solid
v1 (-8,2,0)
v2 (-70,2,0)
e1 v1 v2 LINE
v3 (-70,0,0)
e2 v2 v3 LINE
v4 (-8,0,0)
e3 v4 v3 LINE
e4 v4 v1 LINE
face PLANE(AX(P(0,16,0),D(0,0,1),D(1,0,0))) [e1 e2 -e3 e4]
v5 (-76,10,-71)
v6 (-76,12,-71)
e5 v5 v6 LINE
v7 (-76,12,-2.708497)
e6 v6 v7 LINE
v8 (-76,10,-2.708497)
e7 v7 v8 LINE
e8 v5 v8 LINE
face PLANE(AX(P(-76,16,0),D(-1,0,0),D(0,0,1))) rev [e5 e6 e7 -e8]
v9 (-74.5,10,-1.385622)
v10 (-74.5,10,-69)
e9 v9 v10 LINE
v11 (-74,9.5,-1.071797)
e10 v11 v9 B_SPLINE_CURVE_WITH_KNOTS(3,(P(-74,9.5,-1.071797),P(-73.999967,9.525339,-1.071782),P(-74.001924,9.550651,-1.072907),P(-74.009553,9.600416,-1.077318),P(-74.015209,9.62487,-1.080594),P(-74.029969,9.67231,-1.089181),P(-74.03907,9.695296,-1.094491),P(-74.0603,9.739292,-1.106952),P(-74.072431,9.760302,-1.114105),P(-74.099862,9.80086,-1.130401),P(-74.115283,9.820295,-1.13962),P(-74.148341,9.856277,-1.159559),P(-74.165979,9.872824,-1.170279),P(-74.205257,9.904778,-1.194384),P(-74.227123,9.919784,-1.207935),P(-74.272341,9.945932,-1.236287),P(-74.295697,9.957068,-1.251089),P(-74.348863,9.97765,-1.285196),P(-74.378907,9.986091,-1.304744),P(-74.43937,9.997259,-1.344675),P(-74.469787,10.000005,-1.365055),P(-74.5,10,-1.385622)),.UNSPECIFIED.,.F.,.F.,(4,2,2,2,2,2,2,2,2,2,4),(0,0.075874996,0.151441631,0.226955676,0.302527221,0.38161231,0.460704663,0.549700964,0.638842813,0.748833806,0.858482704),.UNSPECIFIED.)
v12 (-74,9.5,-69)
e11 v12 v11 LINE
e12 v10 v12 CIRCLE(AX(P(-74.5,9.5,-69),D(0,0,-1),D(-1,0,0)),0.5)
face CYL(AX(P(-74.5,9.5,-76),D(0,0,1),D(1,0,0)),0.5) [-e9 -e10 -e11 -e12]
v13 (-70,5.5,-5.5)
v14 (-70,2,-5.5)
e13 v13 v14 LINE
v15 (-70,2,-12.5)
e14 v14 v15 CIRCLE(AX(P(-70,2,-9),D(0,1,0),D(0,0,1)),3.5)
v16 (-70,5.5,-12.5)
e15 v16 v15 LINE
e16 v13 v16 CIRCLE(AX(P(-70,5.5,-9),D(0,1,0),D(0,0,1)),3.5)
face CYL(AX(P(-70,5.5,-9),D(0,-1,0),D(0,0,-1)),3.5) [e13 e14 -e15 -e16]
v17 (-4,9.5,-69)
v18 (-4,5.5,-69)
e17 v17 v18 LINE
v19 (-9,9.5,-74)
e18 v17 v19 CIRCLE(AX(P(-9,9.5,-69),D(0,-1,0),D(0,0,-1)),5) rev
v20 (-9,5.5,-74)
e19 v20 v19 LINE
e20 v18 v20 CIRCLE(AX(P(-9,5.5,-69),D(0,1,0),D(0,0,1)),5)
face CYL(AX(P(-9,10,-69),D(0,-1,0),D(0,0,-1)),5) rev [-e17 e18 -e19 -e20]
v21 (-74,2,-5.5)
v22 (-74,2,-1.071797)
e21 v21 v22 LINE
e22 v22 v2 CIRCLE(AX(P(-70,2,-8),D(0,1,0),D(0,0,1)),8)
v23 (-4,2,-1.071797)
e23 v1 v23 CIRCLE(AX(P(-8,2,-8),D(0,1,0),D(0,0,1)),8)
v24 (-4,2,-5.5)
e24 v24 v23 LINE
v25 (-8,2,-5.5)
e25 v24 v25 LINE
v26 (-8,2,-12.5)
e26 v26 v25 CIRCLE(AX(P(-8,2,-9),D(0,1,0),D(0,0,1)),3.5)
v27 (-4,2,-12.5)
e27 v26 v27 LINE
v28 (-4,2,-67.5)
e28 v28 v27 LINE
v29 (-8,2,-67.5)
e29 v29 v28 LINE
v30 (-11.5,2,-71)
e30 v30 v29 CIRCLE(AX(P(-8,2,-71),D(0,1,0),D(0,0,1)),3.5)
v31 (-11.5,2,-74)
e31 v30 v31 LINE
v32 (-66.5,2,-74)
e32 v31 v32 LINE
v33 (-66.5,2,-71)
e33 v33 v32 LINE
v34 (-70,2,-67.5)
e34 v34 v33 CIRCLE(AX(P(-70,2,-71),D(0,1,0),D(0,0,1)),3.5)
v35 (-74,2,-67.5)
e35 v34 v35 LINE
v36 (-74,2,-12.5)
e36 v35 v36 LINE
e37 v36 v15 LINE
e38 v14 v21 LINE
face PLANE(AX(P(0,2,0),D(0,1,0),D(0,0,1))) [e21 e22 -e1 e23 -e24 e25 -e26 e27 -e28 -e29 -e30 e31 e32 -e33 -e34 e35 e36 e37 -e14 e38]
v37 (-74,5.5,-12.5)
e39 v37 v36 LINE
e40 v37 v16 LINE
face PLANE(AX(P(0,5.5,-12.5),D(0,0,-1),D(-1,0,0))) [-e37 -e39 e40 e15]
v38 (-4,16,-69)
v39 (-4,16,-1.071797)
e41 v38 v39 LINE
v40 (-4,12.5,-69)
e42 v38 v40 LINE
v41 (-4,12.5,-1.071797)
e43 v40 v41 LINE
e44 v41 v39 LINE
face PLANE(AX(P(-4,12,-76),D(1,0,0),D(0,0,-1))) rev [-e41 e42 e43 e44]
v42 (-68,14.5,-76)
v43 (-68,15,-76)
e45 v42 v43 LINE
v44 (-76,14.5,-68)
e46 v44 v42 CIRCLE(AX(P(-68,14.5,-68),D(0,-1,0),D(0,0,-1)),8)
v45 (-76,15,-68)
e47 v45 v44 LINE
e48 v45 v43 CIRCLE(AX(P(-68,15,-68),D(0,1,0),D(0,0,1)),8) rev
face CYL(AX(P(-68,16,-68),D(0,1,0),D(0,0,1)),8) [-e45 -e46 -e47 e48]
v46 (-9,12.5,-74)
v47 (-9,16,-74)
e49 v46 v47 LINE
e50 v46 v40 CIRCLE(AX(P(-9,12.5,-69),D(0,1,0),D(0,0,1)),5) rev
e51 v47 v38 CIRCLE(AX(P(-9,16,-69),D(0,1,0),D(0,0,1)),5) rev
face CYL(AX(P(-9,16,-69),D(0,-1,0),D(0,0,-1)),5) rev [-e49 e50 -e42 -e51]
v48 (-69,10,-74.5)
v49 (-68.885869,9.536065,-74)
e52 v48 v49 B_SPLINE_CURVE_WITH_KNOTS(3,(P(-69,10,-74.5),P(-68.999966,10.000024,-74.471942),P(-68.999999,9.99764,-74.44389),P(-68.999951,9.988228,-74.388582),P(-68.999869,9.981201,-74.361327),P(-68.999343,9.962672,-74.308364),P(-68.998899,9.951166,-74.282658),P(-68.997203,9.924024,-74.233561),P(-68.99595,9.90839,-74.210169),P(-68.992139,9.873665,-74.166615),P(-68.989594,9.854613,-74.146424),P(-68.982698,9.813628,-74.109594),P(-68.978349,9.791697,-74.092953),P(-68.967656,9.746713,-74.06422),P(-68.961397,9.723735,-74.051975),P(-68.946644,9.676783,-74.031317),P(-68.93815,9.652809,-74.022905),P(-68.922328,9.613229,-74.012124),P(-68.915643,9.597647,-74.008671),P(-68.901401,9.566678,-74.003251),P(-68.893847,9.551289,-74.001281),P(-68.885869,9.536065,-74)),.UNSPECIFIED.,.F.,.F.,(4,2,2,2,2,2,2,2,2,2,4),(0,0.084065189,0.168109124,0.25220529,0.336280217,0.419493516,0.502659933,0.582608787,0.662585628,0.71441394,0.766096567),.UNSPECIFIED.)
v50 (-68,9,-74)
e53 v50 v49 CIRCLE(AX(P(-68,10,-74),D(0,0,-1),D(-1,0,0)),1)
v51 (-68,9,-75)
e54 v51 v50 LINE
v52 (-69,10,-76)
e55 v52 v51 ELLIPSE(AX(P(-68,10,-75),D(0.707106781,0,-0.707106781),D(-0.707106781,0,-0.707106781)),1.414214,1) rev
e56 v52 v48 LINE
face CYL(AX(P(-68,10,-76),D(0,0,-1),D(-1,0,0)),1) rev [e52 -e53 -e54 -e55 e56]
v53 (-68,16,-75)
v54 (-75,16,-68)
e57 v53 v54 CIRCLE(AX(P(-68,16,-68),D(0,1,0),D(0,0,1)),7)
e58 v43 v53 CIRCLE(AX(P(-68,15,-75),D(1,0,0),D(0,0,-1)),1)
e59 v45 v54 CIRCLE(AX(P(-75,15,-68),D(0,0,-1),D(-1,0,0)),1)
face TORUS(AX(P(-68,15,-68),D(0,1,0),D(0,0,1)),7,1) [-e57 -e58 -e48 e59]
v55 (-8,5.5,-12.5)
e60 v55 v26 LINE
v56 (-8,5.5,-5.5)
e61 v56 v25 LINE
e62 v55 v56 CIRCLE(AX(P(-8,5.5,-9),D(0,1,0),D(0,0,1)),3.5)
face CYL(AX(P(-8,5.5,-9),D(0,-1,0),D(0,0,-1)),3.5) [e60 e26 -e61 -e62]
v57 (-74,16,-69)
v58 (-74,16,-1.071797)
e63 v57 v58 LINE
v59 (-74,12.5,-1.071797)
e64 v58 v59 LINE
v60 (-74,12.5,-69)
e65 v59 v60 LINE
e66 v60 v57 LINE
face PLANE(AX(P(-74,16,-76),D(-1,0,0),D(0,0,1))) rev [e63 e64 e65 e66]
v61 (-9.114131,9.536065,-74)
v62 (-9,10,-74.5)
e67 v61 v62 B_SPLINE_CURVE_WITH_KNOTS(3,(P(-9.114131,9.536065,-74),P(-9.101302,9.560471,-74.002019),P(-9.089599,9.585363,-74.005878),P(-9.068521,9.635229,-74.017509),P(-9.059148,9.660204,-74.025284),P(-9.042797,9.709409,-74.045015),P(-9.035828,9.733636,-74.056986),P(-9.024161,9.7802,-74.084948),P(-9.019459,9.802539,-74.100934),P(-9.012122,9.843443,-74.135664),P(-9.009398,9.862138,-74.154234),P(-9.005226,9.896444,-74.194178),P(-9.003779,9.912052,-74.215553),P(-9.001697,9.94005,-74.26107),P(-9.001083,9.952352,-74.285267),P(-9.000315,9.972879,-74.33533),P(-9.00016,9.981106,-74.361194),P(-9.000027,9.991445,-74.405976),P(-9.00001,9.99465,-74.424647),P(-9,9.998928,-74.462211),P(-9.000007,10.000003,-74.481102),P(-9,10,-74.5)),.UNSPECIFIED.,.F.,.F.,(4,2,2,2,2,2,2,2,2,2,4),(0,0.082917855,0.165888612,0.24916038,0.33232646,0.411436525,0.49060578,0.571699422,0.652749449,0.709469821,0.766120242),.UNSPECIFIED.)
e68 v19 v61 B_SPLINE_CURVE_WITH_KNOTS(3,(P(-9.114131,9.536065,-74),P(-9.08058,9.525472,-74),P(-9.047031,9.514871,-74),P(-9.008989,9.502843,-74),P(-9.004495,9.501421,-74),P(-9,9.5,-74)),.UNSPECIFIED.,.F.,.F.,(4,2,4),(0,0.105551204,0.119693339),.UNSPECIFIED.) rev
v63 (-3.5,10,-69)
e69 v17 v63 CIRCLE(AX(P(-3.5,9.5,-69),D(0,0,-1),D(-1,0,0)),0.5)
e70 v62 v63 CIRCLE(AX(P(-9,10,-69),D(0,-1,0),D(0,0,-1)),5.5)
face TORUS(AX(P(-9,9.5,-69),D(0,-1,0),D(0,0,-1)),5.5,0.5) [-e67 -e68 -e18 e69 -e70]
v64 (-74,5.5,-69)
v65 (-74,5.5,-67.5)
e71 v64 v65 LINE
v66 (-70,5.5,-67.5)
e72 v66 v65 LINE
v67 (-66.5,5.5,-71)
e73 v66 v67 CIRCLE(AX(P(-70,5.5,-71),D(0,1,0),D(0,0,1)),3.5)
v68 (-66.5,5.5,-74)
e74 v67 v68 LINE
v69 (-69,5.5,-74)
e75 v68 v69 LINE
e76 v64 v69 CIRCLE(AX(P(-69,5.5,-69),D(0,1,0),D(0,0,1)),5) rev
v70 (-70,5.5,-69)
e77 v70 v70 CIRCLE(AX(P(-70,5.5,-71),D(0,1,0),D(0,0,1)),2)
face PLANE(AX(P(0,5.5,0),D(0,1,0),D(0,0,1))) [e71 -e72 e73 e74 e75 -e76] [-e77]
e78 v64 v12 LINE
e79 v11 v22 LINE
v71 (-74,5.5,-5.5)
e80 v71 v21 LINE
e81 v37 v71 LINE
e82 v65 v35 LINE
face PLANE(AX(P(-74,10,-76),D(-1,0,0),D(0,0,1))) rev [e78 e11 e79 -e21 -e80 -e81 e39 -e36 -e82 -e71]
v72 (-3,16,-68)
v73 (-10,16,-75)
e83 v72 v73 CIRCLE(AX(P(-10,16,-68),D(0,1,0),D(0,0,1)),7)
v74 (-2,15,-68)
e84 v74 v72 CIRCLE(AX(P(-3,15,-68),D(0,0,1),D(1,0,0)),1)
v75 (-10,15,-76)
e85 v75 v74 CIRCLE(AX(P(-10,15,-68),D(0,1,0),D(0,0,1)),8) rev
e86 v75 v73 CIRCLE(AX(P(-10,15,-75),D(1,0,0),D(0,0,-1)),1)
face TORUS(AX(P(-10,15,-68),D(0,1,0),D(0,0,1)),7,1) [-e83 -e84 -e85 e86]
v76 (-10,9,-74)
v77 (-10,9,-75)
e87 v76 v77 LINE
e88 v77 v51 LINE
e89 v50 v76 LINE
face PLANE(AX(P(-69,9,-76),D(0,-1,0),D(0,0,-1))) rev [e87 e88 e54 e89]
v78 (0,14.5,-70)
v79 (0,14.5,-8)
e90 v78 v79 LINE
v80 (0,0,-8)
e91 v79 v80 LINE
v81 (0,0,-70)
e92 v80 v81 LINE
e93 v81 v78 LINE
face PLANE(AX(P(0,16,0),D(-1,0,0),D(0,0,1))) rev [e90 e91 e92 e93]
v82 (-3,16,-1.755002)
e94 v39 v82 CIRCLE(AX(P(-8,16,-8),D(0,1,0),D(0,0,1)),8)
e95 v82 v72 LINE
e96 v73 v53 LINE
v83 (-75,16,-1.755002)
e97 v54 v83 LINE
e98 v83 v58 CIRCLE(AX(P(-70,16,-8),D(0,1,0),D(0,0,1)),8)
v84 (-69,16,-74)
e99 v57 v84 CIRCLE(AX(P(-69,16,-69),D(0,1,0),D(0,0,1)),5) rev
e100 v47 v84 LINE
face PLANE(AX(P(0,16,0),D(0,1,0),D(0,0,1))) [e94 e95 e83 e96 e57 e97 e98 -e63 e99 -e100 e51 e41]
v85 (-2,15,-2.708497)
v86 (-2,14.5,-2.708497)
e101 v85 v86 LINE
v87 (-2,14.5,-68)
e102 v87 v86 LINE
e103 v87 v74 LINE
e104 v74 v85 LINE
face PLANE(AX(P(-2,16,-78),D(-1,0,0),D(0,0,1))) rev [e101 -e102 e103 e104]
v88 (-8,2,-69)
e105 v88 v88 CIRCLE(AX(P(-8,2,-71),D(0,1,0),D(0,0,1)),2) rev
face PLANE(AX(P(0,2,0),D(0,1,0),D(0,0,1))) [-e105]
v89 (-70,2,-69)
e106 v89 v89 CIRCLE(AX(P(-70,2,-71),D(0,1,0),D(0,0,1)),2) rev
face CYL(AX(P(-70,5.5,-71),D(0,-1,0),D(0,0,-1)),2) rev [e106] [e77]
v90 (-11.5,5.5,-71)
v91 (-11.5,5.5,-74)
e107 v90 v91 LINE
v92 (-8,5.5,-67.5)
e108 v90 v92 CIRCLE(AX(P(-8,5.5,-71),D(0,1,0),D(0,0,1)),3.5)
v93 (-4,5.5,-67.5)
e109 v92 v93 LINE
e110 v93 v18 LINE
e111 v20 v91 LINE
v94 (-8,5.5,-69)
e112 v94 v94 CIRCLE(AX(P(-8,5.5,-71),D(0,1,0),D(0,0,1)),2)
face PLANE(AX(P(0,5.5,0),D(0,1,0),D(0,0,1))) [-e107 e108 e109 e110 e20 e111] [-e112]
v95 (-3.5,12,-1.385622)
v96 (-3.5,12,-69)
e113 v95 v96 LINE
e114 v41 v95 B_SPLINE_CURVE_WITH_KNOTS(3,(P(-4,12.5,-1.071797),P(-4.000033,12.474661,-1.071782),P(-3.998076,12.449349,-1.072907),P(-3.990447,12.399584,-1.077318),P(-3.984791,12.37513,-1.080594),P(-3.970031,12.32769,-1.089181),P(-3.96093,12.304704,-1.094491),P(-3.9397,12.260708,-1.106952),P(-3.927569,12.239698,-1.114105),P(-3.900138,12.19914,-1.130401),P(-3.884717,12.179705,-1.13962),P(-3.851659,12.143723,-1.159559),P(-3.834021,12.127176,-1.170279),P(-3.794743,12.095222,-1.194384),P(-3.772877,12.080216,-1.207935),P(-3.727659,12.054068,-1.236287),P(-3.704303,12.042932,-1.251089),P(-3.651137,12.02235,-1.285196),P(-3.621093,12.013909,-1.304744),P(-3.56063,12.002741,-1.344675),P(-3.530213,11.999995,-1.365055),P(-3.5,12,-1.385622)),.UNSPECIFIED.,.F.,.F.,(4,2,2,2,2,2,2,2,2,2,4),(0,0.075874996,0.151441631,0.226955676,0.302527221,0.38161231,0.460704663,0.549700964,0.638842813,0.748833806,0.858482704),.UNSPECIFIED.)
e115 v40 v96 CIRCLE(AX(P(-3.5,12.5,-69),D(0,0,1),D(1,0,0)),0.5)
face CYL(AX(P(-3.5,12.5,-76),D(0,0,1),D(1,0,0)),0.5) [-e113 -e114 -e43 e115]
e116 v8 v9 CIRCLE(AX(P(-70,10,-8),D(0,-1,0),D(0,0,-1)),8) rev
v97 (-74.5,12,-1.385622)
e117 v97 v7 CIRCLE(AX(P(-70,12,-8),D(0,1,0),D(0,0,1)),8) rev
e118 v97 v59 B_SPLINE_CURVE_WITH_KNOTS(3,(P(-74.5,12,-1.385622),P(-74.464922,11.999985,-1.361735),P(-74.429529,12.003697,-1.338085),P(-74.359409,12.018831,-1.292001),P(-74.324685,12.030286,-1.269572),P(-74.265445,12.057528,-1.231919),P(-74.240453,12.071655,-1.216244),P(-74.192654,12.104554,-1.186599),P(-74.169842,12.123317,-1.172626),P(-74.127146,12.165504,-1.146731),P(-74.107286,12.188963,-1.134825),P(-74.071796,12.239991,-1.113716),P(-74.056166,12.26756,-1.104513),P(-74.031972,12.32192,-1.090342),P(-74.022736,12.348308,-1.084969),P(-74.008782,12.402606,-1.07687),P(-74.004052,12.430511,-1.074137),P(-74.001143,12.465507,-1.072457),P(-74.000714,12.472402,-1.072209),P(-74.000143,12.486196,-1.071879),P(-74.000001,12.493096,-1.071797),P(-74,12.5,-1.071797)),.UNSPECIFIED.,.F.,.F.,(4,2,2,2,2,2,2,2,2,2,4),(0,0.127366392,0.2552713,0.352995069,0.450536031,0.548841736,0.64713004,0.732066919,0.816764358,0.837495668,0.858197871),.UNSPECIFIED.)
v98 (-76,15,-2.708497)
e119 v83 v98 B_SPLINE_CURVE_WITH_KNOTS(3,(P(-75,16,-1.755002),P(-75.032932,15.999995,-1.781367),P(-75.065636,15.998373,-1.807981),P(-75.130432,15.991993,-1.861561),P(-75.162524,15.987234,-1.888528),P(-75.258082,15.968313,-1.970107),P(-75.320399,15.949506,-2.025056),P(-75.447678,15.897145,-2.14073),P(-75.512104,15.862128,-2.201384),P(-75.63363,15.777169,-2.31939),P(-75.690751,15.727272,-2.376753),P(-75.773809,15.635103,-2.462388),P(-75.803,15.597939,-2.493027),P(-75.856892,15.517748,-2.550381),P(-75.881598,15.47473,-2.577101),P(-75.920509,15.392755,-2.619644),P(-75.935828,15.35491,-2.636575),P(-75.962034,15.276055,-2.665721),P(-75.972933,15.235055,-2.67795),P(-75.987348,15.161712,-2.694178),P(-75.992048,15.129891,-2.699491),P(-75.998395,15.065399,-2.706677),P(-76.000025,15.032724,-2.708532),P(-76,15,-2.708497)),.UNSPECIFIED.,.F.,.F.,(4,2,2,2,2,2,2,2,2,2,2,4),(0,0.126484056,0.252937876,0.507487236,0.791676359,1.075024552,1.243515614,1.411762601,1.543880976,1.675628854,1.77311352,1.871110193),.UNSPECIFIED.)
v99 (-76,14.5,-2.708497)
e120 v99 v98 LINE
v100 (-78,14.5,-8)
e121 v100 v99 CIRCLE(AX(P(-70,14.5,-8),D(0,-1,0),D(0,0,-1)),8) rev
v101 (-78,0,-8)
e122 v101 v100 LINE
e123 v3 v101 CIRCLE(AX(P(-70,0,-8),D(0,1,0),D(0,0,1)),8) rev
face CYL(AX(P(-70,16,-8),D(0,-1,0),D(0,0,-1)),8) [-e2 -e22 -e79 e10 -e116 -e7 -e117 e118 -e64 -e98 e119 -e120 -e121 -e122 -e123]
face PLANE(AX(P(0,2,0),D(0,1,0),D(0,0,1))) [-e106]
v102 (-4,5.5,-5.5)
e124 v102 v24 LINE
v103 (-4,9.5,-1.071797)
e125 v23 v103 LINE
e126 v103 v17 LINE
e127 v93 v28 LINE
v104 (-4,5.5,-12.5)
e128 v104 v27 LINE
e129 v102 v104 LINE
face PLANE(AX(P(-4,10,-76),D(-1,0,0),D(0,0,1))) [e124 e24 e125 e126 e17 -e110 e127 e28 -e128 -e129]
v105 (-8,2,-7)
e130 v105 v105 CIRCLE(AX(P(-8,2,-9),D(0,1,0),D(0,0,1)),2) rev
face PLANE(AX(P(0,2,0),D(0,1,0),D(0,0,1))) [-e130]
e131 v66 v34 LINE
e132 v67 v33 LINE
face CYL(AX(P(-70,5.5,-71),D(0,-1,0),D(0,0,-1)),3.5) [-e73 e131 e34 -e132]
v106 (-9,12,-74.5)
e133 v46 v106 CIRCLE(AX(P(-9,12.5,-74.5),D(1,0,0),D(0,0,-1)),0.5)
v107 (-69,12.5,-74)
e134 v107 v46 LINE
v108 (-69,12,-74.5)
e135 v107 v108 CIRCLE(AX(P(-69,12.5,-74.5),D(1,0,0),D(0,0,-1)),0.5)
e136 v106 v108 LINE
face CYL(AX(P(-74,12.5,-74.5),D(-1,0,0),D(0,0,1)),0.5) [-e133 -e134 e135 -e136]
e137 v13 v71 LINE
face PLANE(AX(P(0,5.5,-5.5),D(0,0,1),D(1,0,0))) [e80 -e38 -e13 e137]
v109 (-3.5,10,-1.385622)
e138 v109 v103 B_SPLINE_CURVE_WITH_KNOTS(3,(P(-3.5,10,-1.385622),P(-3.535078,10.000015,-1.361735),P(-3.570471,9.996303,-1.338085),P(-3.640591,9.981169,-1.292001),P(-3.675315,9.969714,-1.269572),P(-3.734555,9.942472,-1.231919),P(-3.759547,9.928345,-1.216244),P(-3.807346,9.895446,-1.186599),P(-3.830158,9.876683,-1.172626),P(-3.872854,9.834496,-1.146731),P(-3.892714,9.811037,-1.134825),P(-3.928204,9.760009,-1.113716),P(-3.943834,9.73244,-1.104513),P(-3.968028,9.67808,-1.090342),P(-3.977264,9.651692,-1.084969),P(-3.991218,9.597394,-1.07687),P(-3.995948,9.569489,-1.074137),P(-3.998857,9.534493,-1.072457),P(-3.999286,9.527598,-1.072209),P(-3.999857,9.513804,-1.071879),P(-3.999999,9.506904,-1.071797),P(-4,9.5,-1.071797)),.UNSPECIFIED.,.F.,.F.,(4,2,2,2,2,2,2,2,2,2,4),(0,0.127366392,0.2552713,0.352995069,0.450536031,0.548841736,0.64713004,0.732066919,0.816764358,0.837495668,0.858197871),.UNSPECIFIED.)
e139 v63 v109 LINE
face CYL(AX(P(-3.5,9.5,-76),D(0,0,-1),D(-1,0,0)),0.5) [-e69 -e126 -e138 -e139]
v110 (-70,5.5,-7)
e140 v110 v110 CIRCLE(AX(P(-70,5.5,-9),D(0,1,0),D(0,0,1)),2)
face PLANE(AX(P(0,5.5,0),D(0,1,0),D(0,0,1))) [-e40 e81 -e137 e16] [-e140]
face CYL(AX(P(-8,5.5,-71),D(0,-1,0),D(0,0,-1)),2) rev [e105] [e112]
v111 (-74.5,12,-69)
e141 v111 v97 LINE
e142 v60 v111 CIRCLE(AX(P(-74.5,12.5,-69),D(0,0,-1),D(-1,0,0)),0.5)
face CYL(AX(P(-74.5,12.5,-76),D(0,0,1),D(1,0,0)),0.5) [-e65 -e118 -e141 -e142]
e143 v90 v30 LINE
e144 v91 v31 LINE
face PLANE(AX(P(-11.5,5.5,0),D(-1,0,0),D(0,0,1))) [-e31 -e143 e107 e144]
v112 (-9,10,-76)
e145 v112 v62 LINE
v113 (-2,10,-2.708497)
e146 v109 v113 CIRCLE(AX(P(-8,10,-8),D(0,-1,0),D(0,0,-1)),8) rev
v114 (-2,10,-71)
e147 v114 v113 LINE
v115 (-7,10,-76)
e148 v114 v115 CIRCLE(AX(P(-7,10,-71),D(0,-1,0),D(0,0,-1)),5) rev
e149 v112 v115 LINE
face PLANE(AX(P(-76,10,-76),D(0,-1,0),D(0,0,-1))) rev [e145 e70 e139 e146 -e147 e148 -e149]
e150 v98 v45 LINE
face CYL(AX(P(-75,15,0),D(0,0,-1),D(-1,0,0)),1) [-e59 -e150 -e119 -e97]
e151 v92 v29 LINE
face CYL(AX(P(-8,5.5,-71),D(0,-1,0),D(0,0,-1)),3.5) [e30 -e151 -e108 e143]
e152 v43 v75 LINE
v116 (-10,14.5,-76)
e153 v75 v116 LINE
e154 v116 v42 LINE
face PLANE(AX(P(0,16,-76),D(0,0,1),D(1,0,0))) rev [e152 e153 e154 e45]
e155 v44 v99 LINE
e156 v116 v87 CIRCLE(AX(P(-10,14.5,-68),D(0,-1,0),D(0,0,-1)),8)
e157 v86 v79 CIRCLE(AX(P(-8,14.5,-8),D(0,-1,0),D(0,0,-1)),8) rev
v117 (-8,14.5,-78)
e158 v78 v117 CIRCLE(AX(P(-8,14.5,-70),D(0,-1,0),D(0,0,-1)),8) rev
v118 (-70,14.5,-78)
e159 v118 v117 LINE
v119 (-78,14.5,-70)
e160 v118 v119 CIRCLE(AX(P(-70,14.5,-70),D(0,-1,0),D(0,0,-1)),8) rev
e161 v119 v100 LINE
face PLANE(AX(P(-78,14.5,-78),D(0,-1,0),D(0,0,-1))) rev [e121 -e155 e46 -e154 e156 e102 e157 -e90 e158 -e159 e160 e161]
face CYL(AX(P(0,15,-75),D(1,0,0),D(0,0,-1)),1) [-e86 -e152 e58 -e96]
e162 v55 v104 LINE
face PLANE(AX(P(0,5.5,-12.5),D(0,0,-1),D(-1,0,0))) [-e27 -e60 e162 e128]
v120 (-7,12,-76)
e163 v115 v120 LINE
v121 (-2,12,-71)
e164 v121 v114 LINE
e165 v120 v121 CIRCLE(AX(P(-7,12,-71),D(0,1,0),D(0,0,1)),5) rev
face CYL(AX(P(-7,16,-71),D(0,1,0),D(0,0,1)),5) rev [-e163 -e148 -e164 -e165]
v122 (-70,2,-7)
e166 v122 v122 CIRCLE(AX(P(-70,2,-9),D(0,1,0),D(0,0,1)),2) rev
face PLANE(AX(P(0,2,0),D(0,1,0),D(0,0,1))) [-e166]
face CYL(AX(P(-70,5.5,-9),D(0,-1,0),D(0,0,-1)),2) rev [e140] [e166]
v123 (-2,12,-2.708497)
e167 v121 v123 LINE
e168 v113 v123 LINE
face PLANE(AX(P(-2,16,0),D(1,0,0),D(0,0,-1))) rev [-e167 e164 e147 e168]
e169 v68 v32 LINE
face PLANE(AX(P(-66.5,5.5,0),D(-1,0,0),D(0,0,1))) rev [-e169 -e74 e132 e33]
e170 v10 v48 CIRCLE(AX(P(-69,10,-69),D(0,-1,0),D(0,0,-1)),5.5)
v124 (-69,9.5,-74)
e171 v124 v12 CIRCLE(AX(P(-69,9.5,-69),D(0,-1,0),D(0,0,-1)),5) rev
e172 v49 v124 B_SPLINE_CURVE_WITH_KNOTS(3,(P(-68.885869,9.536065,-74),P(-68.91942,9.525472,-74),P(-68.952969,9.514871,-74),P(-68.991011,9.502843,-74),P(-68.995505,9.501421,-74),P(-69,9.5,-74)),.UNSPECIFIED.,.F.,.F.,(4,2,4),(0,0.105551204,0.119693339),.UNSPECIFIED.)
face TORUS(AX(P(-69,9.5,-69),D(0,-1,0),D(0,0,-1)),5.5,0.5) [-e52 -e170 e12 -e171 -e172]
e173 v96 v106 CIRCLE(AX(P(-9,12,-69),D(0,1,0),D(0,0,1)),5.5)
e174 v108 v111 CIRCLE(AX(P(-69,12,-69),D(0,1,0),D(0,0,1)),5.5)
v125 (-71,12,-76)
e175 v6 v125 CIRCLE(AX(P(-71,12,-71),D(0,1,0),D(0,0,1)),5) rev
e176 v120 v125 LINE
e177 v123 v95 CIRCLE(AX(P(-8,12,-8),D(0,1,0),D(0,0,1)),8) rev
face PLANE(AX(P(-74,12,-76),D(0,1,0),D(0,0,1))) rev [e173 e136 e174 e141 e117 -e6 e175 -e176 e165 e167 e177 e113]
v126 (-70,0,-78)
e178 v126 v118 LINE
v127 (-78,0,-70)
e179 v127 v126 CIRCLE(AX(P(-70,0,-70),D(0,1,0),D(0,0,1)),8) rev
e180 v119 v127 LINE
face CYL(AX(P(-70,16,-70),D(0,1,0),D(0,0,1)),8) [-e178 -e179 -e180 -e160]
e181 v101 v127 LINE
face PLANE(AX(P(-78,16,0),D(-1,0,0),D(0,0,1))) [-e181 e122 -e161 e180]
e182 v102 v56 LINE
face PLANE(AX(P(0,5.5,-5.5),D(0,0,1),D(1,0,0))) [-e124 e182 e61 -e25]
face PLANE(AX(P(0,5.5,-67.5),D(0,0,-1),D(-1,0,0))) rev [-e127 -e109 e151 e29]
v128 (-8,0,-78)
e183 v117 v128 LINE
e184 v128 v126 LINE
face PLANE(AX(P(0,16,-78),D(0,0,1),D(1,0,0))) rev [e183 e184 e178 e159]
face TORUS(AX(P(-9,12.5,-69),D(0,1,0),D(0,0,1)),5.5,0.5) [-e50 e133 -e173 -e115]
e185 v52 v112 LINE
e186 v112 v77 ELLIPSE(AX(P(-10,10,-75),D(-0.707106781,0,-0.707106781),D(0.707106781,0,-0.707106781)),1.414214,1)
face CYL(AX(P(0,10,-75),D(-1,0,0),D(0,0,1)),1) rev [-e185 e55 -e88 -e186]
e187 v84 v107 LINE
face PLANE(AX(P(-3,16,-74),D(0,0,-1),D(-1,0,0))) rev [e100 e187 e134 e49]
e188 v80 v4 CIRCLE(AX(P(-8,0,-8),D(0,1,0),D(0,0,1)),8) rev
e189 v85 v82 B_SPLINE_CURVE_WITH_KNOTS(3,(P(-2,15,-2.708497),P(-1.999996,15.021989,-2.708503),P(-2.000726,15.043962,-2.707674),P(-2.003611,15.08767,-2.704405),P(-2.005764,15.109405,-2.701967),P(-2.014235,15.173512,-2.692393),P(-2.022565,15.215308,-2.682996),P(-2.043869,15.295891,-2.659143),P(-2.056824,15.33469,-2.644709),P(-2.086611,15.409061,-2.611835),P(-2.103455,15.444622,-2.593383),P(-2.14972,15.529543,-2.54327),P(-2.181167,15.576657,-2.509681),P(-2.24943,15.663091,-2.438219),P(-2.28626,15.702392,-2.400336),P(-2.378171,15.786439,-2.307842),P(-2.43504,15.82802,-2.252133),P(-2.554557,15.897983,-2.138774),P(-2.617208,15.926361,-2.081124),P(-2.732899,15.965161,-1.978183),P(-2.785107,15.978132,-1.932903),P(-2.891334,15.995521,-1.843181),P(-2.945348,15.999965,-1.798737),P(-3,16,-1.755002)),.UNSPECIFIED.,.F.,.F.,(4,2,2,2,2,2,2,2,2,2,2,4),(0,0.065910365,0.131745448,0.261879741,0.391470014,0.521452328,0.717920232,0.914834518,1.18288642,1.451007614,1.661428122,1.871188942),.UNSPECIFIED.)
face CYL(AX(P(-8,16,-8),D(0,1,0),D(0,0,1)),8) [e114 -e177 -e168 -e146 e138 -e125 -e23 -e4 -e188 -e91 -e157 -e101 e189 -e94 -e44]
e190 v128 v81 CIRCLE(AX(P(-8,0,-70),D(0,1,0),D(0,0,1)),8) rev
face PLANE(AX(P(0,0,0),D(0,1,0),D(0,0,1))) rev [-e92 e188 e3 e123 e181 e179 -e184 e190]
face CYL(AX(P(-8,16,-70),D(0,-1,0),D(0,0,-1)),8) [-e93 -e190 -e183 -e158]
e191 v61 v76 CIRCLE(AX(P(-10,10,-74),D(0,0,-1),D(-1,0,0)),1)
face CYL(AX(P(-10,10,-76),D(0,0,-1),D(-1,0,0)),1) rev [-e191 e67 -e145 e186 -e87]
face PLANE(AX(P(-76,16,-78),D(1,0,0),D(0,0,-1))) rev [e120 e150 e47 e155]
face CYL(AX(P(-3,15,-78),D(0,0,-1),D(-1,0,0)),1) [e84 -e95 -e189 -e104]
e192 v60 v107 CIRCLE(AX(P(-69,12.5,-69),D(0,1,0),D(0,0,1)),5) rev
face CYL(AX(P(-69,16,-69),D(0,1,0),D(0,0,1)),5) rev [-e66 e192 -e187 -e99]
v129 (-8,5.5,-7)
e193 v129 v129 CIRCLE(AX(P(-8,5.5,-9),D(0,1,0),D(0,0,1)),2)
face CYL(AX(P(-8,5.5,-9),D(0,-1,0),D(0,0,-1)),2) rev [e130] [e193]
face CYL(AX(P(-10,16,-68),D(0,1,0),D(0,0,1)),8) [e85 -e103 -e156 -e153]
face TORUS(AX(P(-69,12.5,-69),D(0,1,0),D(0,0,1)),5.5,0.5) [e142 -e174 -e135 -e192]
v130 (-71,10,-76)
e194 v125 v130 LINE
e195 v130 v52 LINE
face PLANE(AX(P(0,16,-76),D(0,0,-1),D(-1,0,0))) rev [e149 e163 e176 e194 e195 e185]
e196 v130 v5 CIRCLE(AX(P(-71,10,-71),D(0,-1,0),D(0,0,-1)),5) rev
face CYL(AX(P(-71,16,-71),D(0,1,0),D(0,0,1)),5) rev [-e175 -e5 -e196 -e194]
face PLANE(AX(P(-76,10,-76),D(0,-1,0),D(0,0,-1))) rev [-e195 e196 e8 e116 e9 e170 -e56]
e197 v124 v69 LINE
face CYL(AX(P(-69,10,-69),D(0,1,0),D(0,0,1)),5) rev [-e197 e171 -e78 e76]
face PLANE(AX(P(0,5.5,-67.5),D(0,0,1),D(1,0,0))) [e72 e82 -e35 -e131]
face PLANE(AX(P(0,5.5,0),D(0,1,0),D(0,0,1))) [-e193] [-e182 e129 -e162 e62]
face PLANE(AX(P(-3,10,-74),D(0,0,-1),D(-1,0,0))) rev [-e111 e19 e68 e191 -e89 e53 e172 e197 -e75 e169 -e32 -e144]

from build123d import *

# Parameters (mm, degrees)
BOSS_EXTRUDE1_DEPTH = 16
SKETCH2_4_W         = 74
SKETCH2_4_H         = 76
BOSS_EXTRUDE2_DEPTH = 2
SKETCH3_W           = 2
SKETCH3_H           = 4
SKETCH3_H_2         = 8
BOSS_EXTRUDE3_DEPTH = 76
LPATTERN1_COUNT     = 2
LPATTERN1_PITCH     = 72
SKETCH4_W           = 2
SKETCH4_H           = 4
SKETCH4_H_2         = 8
BOSS_EXTRUDE5_DEPTH = 71
FILLET2_R           = 5
SKETCH7_R           = 2
BOSS_EXTRUDE9_DEPTH = 3.5
SKETCH8_W           = 60
SKETCH8_H           = 1
CUT_EXTRUDE1_DEPTH  = 2
FILLET12_R          = 1
SKETCH11_W          = 2
SKETCH11_H          = 1.5
CUT_EXTRUDE2_DEPTH  = 112.462998345
SKETCH12_W          = 2
SKETCH12_H          = 1.5
CUT_EXTRUDE3_DEPTH  = 111.072703247
FILLET13_R          = 8
FILLET14_R          = 1
FILLET16_R          = 0.5


# Some blends are built 0.0001 mm under size
with BuildPart() as part:
    # Sketch2 → Boss-Extrude1 (new body)
    with BuildSketch(Plane(origin=(0, 0, 0), x_dir=(1, 0, 0), z_dir=(0, 1, 0))):
        Polygon((-78, 0), (-76, 0), (-76, 76), (-2, 76), (-2, 0), (0, 0), (0, 78), (-78, 78), align=None)
    extrude(amount=BOSS_EXTRUDE1_DEPTH)

    # Sketch2<4> → Boss-Extrude2 (add)
    with BuildSketch(Plane(origin=(0, 0, 0), x_dir=(1, 0, 0), z_dir=(0, 1, 0))):
        with Locations((-39, 38)):
            Rectangle(SKETCH2_4_W, SKETCH2_4_H)
    extrude(amount=BOSS_EXTRUDE2_DEPTH)

    # Sketch3 → Boss-Extrude3 (add)
    with BuildSketch(Plane.XY):
        with Locations((-75, 14)):
            Rectangle(SKETCH3_W, SKETCH3_H)
        with Locations((-75, 6)):
            Rectangle(SKETCH3_W, SKETCH3_H_2)
    boss_extrude3 = extrude(amount=-BOSS_EXTRUDE3_DEPTH)

    # LPattern1: Boss-Extrude3 ×2
    with Locations(*[(i * LPATTERN1_PITCH, 0, 0) for i in range(1, LPATTERN1_COUNT)]):
        add(boss_extrude3)

    # Sketch4 → Boss-Extrude5 (add)
    with BuildSketch(Plane(origin=(-74, 0, 0), x_dir=(0, 0, -1), z_dir=(1, 0, 0))):
        with Locations((75, 14)):
            Rectangle(SKETCH4_W, SKETCH4_H)
        with Locations((75, 6)):
            Rectangle(SKETCH4_W, SKETCH4_H_2)
    extrude(amount=BOSS_EXTRUDE5_DEPTH)

    # Fillet2
    fillet2_edges = [part.edges().sort_by_distance(p)[0] for p in [
        (-74, 14, -74),
        (-4, 6, -74),
        (-74, 6, -74),
        (-76, 11, -76),
        (-2, 11, -76),
        (-4, 14, -74),
    ]]
    fillet(fillet2_edges, radius=FILLET2_R)

    # Sketch7 → Boss-Extrude9 (add)
    # profile 1 of 4: a face of its own
    with BuildSketch(Plane(origin=(0, 2, 0), x_dir=(1, 0, 0), z_dir=(0, 1, 0))):
        with BuildLine():
            Line((-66.5, 74.491060011), (-74, 74.491060011))
            Line((-74, 74.491060011), (-74, 67.5))
            Line((-74, 67.5), (-70, 67.5))
            ThreePointArc((-70, 67.5), (-67.525126266, 68.525126266), (-66.5, 71))
            Line((-66.5, 71), (-66.5, 74.491060011))
        make_face()
        with Locations(Location((-70, 71, 0), (0, 0, 270))):
            Circle(SKETCH7_R, mode=Mode.SUBTRACT)
    # profile 2 of 4: a face of its own
    with BuildSketch(Plane(origin=(0, 2, 0), x_dir=(1, 0, 0), z_dir=(0, 1, 0))):
        with BuildLine():
            ThreePointArc((-11.5, 71), (-10.474873734, 68.525126266), (-8, 67.5))
            Line((-8, 67.5), (-4, 67.5))
            Line((-4, 67.5), (-4, 74.5))
            Line((-4, 74.5), (-11.5, 74.5))
            Line((-11.5, 74.5), (-11.5, 71))
        make_face()
        with Locations(Location((-8, 71, 0), (0, 0, 270))):
            Circle(SKETCH7_R, mode=Mode.SUBTRACT)
    # profile 3 of 4: a face of its own
    with BuildSketch(Plane(origin=(0, 2, 0), x_dir=(1, 0, 0), z_dir=(0, 1, 0))):
        with BuildLine():
            Line((-74, 5.5), (-70, 5.5))
            ThreePointArc((-70, 5.5), (-66.5, 9), (-70, 12.5))
            Line((-70, 12.5), (-74, 12.5))
            Line((-74, 12.5), (-74, 5.5))
        make_face()
        with Locations(Location((-70, 9, 0), (0, 0, 270))):
            Circle(SKETCH7_R, mode=Mode.SUBTRACT)
    # profile 4 of 4: a face of its own
    with BuildSketch(Plane(origin=(0, 2, 0), x_dir=(1, 0, 0), z_dir=(0, 1, 0))):
        with BuildLine():
            Line((-4, 12.5), (-8, 12.5))
            ThreePointArc((-8, 12.5), (-11.5, 9), (-8, 5.5))
            Line((-8, 5.5), (-4, 5.5))
            Line((-4, 5.5), (-4, 12.5))
        make_face()
        with Locations(Location((-8, 9, 0), (0, 0, 270))):
            Circle(SKETCH7_R, mode=Mode.SUBTRACT)
    extrude(amount=BOSS_EXTRUDE9_DEPTH)

    # Sketch8 → Cut-Extrude1 (cut)
    with BuildSketch(Plane.XY.offset(-74)):
        with Locations((-39, 9.5)):
            Rectangle(SKETCH8_W, SKETCH8_H)
    extrude(amount=-CUT_EXTRUDE1_DEPTH, mode=Mode.SUBTRACT)

    # Fillet12
    fillet12_edges = [part.edges().sort_by_distance(p)[0] for p in [
        (-9, 9, -75),
        (-69, 9, -75),
        (-39, 9, -76),
    ]]
    fillet(fillet12_edges, radius=FILLET12_R - 0.0001)  # a hair under: the kernel refuses the full size

    # Sketch11 → Cut-Extrude2 (cut, through all)
    with BuildSketch(Plane.XY):
        with Locations((-77, 15.25)):
            Rectangle(SKETCH11_W, SKETCH11_H)
        with Locations((-1, 15.25)):
            Rectangle(SKETCH11_W, SKETCH11_H)
    extrude(amount=-CUT_EXTRUDE2_DEPTH, mode=Mode.SUBTRACT)

    # Sketch12 → Cut-Extrude3 (cut, through all)
    with BuildSketch(Plane.ZY.offset(76)):
        with Locations((-77, 15.25)):
            Rectangle(SKETCH12_W, SKETCH12_H)
    extrude(amount=-CUT_EXTRUDE3_DEPTH, mode=Mode.SUBTRACT)

    # Fillet13
    # the kernel refuses this fillet: 8 mm, written as the material it takes off along each edge
    with BuildSketch(Plane(origin=(-78, -20, -78), x_dir=(0, 0, 1), z_dir=(0, 1, 0)), Plane(origin=(0, -20, -78), x_dir=(-1, 0, 0), z_dir=(0, 1, 0)), Plane(origin=(-78, -20, 0), x_dir=(1, 0, 0), z_dir=(0, 1, 0))) as fillet13_piece_1:
        with BuildLine():
            CenterArc((FILLET13_R, FILLET13_R), FILLET13_R, 180, 90)
            Line((0, FILLET13_R), (0, 0))
            Line((0, 0), (FILLET13_R, 0))
        make_face()
    extrude(amount=54.5, mode=Mode.SUBTRACT)
    with BuildSketch(Plane(origin=(-76, 36, -76), x_dir=(0, 0, 1), z_dir=(0, -1, 0)), Plane(origin=(-2, 36, -76), x_dir=(-1, 0, 0), z_dir=(0, -1, 0))) as fillet13_piece_2:
        with BuildLine():
            CenterArc((FILLET13_R, -FILLET13_R), FILLET13_R, 90, 90)
            Line((0, -FILLET13_R), (0, 0))
            Line((0, 0), (FILLET13_R, 0))
        make_face()
    extrude(amount=21.5, mode=Mode.SUBTRACT)
    with BuildSketch(Plane(origin=(0, -20, 0), x_dir=(-1, 0, 0), z_dir=(0, 1, 0))) as fillet13_piece_3:
        with BuildLine():
            CenterArc((FILLET13_R, -FILLET13_R), FILLET13_R, 90, 90)
            Line((0, -FILLET13_R), (0, 0))
            Line((0, 0), (FILLET13_R, 0))
        make_face()
    extrude(amount=54.5, mode=Mode.SUBTRACT)

    # Fillet14
    fillet14_edges = [part.edges().sort_by_distance(p)[0] for p in [
        (-39, 16, -76),
        (-76, 16, -35.354248689),
        (-2, 16, -35.354248689),
        (-4.343145751, 16, -73.656854249),
        (-73.656854249, 16, -73.656854249),
    ]]
    fillet(fillet14_edges, radius=FILLET14_R)

    # Fillet16
    # the kernel refuses this fillet: 0.5 mm, written as the material it takes off along each edge
    with BuildSketch(Plane(origin=(-74, 10, 0.17820323), x_dir=(0, -1, 0), z_dir=(0, 0, -1)), Plane(origin=(-4, 10, 0.17820323), x_dir=(1, 0, 0), z_dir=(0, 0, -1)), Plane(origin=(-4, 12, 0.17820323), x_dir=(0, 1, 0), z_dir=(0, 0, -1)), Plane(origin=(-74, 12, 0.17820323), x_dir=(-1, 0, 0), z_dir=(0, 0, -1))) as fillet16_piece_1:
        with BuildLine():
            CenterArc((FILLET16_R, FILLET16_R), FILLET16_R, 180, 90)
            Line((0, FILLET16_R), (0, 0))
            Line((0, 0), (FILLET16_R, 0))
        make_face()
    extrude(amount=69.17820323, mode=Mode.SUBTRACT)
    with BuildSketch(Plane(origin=(-69, 12, -74), x_dir=(0, 0, -1), z_dir=(1, 0, 0))) as fillet16_piece_2:
        with BuildLine():
            CenterArc((FILLET16_R, FILLET16_R), FILLET16_R, 180, 90)
            Line((0, FILLET16_R), (0, 0))
            Line((0, 0), (FILLET16_R, 0))
        make_face()
    extrude(amount=60, mode=Mode.SUBTRACT)
    with BuildSketch(Plane(origin=(-9, 12, -69), x_dir=(1, 0, 0), z_dir=(0, 0, 1))) as fillet16_piece_3:
        with BuildLine():
            CenterArc((5 + FILLET16_R, FILLET16_R), FILLET16_R, 180, 90)
            Line((5, FILLET16_R), (5, 0))
            Line((5, 0), (5 + FILLET16_R, 0))
        make_face()
    revolve(axis=Axis((-9, 12, -69), (0, 1, 0)), revolution_arc=90, mode=Mode.SUBTRACT)
    with BuildSketch(Plane(origin=(-9, 10, -69), x_dir=(1, 0, 0), z_dir=(0, 0, 1))) as fillet16_piece_4:
        with BuildLine():
            CenterArc((5 + FILLET16_R, -FILLET16_R), FILLET16_R, 90, 90)
            Line((5, -FILLET16_R), (5, 0))
            Line((5, 0), (5 + FILLET16_R, 0))
        make_face()
    revolve(axis=Axis((-9, 10, -69), (0, 1, 0)), revolution_arc=104.329698924, mode=Mode.SUBTRACT)
    with BuildSketch(Plane(origin=(-69, 12, -69), x_dir=(0, 0, -1), z_dir=(1, 0, 0))) as fillet16_piece_5:
        with BuildLine():
            CenterArc((5 + FILLET16_R, FILLET16_R), FILLET16_R, 180, 90)
            Line((5, FILLET16_R), (5, 0))
            Line((5, 0), (5 + FILLET16_R, 0))
        make_face()
    revolve(axis=Axis((-69, 12, -69), (0, 1, 0)), revolution_arc=90, mode=Mode.SUBTRACT)
    with BuildSketch(Plane(origin=(-69, 10, -69), x_dir=(0.24750126301206582, 0, -0.9688875707776585), z_dir=(0.9688875707776585, 0, 0.24750126301206582))) as fillet16_piece_6:
        with BuildLine():
            CenterArc((5 + FILLET16_R, -FILLET16_R), FILLET16_R, 90, 90)
            Line((5, -FILLET16_R), (5, 0))
            Line((5, 0), (5 + FILLET16_R, 0))
        make_face()
    revolve(axis=Axis((-69, 10, -69), (0, 1, 0)), revolution_arc=104.329698924, mode=Mode.SUBTRACT)


solid = part.part
